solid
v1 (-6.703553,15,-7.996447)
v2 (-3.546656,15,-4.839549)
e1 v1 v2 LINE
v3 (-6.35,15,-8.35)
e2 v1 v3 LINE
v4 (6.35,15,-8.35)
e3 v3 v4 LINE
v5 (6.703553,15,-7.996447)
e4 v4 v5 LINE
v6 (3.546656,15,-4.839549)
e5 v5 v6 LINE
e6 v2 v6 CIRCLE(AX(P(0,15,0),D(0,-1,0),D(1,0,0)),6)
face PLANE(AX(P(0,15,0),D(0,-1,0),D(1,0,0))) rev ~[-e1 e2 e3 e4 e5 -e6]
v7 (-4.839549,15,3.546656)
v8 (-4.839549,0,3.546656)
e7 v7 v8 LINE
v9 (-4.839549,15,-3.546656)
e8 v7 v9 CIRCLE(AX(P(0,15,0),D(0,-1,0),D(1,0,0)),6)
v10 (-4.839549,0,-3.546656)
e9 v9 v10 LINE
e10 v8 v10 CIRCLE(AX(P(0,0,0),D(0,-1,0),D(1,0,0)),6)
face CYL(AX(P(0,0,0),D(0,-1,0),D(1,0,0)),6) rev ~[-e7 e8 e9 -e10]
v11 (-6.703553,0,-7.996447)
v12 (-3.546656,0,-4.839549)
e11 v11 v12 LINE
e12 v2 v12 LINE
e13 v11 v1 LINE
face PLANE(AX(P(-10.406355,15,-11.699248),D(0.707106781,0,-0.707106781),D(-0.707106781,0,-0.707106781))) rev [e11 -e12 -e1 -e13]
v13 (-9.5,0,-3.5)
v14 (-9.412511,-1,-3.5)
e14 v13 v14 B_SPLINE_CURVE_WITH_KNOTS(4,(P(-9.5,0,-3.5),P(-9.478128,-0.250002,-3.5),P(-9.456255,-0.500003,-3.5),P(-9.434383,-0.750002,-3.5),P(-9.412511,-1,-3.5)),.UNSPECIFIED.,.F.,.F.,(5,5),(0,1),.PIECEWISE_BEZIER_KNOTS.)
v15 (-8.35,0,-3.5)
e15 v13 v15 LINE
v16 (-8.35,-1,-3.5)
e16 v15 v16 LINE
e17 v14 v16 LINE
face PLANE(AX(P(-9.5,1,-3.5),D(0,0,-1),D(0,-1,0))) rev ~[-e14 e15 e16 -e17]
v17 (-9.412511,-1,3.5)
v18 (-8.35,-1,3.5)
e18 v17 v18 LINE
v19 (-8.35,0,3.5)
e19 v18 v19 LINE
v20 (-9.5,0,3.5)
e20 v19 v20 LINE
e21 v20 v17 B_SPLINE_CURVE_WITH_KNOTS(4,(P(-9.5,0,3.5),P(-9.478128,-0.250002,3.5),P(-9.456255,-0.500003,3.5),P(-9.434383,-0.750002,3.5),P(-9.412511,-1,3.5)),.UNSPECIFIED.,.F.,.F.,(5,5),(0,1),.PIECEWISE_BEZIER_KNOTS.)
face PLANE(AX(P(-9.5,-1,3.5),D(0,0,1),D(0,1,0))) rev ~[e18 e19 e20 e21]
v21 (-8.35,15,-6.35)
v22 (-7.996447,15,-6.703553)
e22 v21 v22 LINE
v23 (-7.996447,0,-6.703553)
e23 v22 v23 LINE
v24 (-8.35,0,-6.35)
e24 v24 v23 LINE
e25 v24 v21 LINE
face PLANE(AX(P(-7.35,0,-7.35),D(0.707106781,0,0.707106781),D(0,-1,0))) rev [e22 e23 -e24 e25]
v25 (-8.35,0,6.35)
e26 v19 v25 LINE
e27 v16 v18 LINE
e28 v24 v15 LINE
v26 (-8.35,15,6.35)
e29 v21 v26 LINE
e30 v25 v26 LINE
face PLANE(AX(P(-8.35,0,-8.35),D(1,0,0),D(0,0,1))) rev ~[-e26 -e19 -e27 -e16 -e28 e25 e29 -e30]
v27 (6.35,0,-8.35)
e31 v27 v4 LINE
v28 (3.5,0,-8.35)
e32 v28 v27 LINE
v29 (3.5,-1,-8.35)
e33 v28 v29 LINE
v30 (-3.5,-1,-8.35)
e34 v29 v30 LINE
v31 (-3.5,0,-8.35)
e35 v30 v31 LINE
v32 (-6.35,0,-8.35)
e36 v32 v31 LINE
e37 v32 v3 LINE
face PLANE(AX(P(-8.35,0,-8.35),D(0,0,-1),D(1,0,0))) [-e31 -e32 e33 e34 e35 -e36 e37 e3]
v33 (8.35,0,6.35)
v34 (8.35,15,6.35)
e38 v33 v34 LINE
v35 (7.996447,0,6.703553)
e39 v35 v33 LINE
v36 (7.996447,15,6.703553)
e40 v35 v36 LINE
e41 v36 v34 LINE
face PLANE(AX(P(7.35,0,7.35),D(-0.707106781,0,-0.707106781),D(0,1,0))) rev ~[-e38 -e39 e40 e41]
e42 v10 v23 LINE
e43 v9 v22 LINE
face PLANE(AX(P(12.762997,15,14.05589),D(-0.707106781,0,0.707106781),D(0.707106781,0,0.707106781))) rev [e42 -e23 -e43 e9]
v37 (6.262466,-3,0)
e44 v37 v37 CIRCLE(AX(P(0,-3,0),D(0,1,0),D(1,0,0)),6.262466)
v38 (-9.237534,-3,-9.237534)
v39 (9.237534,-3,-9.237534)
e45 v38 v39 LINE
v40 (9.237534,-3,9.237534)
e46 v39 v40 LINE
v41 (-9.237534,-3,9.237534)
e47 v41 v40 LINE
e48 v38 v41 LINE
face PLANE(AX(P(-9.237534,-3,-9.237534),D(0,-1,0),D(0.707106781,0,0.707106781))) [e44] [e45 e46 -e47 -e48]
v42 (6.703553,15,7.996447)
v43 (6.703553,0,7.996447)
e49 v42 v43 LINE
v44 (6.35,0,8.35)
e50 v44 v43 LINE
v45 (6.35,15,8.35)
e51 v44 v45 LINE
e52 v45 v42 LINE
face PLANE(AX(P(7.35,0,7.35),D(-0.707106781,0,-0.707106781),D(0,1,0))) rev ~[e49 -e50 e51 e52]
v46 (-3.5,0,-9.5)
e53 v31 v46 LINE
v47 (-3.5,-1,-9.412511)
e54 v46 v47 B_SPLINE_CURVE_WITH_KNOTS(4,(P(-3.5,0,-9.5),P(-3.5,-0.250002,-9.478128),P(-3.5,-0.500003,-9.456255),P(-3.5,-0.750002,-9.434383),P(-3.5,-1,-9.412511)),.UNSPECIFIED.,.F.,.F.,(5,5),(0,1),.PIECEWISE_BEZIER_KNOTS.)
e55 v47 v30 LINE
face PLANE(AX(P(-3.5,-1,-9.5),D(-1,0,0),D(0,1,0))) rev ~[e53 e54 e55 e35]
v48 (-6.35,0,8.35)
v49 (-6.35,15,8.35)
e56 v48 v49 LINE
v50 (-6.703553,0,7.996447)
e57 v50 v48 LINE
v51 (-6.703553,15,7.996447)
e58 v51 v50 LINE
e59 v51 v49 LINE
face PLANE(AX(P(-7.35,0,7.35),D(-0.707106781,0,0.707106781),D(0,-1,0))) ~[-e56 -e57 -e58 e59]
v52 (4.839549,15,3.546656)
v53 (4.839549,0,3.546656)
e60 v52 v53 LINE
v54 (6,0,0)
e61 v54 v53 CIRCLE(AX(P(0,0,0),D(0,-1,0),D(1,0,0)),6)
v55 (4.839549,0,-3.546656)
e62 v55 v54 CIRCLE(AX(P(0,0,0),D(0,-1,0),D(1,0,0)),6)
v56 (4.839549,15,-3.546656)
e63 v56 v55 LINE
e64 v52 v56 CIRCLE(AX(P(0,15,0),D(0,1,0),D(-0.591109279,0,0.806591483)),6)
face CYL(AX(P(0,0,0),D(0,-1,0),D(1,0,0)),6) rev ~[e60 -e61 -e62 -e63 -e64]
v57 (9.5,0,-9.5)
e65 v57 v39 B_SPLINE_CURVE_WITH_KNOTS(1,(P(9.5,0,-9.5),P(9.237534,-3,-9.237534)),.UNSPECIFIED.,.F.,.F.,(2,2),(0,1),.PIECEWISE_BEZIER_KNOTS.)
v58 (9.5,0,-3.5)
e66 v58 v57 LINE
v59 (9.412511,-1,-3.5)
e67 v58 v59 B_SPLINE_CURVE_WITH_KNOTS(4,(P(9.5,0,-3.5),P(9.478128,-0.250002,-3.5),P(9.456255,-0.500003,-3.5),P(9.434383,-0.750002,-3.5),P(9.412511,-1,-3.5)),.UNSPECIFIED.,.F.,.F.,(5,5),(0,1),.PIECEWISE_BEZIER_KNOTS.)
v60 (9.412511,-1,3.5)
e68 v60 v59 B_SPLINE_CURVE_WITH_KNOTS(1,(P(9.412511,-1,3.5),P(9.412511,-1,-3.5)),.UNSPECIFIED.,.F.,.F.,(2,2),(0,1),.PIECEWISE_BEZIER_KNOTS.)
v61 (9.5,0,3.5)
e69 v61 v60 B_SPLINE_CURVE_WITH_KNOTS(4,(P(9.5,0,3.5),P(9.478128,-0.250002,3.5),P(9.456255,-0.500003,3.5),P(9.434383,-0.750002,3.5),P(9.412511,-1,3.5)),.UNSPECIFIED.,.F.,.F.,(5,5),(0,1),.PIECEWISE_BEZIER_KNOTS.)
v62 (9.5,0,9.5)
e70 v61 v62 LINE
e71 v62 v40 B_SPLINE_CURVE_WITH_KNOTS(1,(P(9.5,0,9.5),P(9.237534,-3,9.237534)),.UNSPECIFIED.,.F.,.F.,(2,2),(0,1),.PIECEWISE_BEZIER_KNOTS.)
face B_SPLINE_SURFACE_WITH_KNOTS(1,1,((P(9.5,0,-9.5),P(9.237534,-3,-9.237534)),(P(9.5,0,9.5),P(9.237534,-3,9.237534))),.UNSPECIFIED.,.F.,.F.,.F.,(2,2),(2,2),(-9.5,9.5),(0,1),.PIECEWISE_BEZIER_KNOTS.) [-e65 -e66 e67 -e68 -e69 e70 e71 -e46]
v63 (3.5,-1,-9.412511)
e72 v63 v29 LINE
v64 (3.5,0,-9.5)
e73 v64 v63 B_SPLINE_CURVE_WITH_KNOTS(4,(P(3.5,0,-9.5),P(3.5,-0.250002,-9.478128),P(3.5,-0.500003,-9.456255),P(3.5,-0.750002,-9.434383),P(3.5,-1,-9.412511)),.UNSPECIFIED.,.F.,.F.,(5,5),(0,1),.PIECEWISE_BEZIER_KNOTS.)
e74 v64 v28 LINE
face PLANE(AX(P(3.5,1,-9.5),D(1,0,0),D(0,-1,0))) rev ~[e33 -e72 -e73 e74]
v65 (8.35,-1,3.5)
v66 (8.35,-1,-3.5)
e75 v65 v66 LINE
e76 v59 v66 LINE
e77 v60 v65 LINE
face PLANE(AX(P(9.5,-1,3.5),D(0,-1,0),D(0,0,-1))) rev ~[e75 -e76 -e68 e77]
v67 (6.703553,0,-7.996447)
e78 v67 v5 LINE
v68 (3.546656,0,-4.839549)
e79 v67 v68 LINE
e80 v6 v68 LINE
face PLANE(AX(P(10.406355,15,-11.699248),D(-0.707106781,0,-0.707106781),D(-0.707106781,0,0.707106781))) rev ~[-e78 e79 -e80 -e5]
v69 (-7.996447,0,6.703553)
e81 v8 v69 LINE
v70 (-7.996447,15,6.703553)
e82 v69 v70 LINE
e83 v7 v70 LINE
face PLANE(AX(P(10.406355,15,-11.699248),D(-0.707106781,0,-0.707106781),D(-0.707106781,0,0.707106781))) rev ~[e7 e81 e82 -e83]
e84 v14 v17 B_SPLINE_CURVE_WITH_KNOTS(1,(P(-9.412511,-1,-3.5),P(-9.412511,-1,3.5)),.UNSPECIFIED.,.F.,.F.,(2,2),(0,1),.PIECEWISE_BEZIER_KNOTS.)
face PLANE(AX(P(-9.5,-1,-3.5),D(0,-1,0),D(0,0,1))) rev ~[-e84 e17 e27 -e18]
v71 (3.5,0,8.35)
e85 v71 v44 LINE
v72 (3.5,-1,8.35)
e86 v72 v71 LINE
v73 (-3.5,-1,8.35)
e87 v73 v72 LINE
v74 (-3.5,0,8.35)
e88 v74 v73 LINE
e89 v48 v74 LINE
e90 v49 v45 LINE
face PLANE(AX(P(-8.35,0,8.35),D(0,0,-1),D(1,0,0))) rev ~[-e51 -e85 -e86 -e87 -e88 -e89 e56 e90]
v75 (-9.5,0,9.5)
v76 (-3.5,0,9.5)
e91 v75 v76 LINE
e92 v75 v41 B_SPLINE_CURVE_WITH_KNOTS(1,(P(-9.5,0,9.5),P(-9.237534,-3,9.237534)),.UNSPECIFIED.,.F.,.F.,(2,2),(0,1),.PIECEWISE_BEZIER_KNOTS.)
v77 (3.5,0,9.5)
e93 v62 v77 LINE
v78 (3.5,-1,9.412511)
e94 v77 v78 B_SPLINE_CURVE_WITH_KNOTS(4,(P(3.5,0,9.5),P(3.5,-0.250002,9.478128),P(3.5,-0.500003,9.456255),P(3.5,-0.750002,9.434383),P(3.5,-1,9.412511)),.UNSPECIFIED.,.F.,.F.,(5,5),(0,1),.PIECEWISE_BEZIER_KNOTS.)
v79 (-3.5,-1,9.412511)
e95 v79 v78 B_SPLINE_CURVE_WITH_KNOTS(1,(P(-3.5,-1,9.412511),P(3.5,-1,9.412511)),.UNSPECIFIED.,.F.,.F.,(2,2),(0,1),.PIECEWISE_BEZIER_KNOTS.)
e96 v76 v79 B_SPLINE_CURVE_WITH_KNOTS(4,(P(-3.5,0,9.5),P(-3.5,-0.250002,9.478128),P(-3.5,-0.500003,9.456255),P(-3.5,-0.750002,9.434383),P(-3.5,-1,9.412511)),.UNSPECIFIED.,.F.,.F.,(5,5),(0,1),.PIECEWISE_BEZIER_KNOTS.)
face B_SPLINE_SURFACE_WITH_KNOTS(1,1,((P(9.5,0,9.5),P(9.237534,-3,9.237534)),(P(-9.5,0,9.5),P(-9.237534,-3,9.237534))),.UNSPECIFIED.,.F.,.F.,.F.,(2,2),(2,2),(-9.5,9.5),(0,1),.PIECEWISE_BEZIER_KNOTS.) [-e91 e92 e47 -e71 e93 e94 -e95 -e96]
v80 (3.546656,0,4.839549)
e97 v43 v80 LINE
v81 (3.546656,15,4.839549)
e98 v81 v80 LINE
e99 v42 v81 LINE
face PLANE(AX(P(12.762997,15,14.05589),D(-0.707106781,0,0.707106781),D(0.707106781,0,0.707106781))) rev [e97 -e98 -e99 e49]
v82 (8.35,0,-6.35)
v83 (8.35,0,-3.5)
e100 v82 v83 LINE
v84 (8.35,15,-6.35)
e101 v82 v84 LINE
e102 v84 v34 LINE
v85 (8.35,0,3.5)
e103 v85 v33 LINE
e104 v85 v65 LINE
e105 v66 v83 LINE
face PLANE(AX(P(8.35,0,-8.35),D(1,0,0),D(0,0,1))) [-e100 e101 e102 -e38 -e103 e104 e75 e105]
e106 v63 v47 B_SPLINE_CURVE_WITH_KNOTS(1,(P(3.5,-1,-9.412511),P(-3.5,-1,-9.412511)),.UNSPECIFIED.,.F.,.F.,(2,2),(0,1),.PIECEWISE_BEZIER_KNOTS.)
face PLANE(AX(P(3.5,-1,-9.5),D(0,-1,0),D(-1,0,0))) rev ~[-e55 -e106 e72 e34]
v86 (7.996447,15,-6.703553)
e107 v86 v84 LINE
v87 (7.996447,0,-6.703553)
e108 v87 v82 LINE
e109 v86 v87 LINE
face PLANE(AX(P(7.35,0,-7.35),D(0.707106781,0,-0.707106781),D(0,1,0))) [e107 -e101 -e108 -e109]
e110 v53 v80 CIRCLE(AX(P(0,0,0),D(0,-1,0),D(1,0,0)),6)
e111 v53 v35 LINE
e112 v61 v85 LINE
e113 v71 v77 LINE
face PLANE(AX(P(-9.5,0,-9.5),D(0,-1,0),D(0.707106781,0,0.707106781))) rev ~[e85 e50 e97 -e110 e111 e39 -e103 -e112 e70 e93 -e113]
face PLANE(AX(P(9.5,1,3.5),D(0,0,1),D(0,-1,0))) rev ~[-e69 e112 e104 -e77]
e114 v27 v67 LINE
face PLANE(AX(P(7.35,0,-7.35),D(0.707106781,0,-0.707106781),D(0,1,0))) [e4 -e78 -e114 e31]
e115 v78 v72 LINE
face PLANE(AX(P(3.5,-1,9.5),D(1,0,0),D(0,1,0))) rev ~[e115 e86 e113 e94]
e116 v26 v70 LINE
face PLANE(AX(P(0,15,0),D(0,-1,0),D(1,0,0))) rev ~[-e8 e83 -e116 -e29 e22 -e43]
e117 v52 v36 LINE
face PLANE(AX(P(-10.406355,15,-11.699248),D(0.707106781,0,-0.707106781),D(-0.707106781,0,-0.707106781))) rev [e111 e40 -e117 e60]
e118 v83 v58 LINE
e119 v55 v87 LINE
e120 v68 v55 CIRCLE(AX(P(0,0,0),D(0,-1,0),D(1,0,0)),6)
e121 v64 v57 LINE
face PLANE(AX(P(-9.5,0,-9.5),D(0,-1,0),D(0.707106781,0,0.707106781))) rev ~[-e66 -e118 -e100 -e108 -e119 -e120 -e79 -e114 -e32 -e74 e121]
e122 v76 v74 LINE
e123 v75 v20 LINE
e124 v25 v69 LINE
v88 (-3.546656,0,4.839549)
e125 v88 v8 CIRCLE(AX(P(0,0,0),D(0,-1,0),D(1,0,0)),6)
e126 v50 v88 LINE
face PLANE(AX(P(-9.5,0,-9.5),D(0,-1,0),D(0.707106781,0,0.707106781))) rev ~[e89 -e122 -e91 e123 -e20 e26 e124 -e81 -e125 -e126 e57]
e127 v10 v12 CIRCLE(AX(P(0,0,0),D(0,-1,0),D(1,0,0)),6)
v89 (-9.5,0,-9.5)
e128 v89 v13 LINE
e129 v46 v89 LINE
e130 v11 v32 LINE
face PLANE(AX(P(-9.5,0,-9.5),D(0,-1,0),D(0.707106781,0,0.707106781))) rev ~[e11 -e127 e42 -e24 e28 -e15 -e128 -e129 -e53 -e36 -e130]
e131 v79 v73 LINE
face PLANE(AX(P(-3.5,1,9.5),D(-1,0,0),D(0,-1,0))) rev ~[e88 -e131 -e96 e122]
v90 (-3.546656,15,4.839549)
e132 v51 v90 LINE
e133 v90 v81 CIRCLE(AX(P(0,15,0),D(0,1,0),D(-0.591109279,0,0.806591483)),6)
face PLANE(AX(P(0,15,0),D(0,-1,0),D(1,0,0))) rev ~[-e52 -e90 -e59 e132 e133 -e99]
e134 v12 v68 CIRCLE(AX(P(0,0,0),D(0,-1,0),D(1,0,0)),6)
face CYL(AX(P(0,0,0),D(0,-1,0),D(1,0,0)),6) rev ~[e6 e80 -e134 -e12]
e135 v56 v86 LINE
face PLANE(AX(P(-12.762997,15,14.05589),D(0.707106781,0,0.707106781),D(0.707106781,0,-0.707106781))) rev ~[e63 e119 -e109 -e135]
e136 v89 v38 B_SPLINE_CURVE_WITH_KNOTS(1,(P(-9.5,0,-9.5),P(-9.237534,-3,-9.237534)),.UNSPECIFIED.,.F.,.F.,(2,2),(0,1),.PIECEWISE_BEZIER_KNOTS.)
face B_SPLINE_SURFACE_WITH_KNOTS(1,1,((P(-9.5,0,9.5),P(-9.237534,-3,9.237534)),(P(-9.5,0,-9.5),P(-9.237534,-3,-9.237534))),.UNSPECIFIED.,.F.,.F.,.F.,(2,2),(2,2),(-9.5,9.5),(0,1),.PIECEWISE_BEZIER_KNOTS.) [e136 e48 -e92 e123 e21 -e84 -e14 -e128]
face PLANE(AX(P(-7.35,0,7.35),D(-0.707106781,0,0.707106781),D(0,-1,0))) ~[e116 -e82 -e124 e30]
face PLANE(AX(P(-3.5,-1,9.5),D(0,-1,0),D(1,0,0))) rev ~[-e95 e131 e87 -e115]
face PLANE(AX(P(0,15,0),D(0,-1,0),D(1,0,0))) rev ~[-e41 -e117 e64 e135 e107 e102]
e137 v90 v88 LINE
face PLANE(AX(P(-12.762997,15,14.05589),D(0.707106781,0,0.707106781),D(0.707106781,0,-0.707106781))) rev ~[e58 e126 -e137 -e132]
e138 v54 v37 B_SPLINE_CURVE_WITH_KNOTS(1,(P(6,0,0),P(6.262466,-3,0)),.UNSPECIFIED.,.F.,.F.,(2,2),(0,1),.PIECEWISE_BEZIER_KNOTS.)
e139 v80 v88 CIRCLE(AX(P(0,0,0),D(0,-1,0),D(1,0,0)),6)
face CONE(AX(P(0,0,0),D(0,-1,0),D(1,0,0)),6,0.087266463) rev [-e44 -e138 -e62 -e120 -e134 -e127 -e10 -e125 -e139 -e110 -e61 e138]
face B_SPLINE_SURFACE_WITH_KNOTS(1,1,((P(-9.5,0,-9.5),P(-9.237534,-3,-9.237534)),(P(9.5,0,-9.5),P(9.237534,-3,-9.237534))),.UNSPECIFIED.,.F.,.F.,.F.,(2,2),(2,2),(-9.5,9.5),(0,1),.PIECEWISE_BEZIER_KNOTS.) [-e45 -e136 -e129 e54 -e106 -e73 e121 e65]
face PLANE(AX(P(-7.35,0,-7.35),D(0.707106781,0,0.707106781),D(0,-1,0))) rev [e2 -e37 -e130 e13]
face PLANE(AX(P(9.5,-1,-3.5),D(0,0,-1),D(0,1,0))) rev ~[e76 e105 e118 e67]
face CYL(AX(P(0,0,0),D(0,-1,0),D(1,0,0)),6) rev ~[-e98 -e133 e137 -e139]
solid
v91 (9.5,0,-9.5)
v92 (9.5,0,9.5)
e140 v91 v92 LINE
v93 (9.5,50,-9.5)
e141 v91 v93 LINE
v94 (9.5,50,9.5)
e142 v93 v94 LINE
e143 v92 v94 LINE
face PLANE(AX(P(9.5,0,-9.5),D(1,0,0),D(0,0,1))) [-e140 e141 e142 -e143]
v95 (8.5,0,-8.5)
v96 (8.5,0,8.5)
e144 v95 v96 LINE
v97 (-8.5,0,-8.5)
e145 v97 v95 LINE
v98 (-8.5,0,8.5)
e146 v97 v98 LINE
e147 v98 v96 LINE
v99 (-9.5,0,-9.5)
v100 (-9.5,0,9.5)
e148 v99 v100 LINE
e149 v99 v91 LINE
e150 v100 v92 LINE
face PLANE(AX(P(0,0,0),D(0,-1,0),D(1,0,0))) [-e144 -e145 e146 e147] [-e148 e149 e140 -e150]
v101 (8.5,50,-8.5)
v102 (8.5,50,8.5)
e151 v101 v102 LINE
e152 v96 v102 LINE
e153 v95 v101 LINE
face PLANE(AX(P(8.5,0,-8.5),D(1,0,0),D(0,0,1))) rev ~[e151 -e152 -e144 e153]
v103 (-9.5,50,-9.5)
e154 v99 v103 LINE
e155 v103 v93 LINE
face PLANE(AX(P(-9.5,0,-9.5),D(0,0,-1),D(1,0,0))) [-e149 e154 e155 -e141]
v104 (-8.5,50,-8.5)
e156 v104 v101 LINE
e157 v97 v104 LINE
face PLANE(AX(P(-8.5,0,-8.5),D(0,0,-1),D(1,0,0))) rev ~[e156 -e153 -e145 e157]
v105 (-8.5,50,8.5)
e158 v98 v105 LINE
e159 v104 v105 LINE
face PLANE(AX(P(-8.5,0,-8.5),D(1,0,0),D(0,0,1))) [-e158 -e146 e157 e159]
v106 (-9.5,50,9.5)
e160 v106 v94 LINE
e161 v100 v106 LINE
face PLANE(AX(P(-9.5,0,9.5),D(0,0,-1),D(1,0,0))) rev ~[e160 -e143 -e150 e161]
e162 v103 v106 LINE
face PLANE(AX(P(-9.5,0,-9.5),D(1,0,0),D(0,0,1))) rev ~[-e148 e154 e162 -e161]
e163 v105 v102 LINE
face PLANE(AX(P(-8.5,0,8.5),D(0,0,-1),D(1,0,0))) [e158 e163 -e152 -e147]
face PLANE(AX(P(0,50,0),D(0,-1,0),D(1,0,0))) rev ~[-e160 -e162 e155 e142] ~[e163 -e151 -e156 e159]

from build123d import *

# Parameters (mm, degrees)
F0_W            = 19
F0_H            = 19
F0_W_2          = 17
F0_H_2          = 17
F1_DEPTH        = 50
F2_W            = 16.7
F2_H            = 16.7
F2_R            = 6
F3_DEPTH        = 15
F4_W            = 19
F4_H            = 19
F4_R            = 6
F5_DEPTH        = 3
F5_TAPER        = 5
F6_W            = 7
F6_H            = 1
F7_DEPTH        = 1.15
F7_COPIES_COUNT = 4
F8_SIZE         = 2
F10_DEPTH       = 15


# Not quite as in the source:
# - a pattern or mirror of a feature is missing from the dataset's text; its kind, count and spacing are read off the source's solid


with BuildPart() as f1:
    # F0 (on Front) → F1 (new body)
    with BuildSketch(Plane.XZ):
        Rectangle(F0_W, F0_H)
        Rectangle(F0_W_2, F0_H_2, mode=Mode.SUBTRACT)
    extrude(amount=-F1_DEPTH)


with BuildPart() as f3:
    # F2 (on face) → F3 (new body)
    with BuildSketch(Plane.XZ):
        Rectangle(F2_W, F2_H)
        Circle(F2_R, mode=Mode.SUBTRACT)
    extrude(amount=-F3_DEPTH)

    # F4 (on face) → F5 (join)
    with BuildSketch(Plane.XZ):
        Rectangle(F4_W, F4_H)
        Circle(F4_R, mode=Mode.SUBTRACT)
    extrude(amount=F5_DEPTH, taper=F5_TAPER)

    # F6 (on face) → F7 (cut)
    with BuildSketch(Plane.XY.offset(9.5)):
        with Locations((0, -0.5)):
            Rectangle(F6_W, F6_H)
        with Locations((0, 0.5)):
            Rectangle(F6_W, F6_H)
    f7 = extrude(amount=-F7_DEPTH, mode=Mode.SUBTRACT)

    # F7_copies: F7 ×4 about axis
    f7_copies_axis = Axis((0, 0, 0), (0, 1, 0))
    for i in range(1, F7_COPIES_COUNT):
        add(f7.rotate(f7_copies_axis, i * 360 / F7_COPIES_COUNT), mode=Mode.SUBTRACT)

    # F8
    f8_edges = [f3.edges().sort_by_distance(p)[0] for p in [
        (8.35, 7.5, 8.35),
        (8.35, 7.5, -8.35),
        (-8.35, 7.5, -8.35),
        (-8.35, 7.5, 8.35),
    ]]
    chamfer(f8_edges, length=F8_SIZE)

    # F9 (on face) → F10 (cut, through all)
    with BuildSketch(Plane(origin=(0, 15, 0), x_dir=(-1, 0, 0), z_dir=(0, 1, 0))):
        with BuildLine():
            Line((7.9964466094, 6.7035533906), (6.7035533906, 7.9964466094))
            Line((6.7035533906, 7.9964466094), (3.5466556766, 4.8395488954))
            ThreePointArc((3.5466556766, 4.8395488954), (4.2426406871, 4.2426406871), (4.8395488954, 3.5466556766))
            Line((4.8395488954, 3.5466556766), (7.9964466094, 6.7035533906))
        make_face()
        Polygon((12.7629971477, 14.0558903665), (6.7035533906, 7.9964466094), (7.9964466094, 6.7035533906), (13.9659964202, 12.6731032014), align=None)
        with BuildLine():
            ThreePointArc((4.8395488954, 3.5466556766), (4.2426406871, 4.2426406871), (3.5466556766, 4.8395488954))
            Line((3.5466556766, 4.8395488954), (-4.8395488954, -3.5466556766))
            ThreePointArc((-4.8395488954, -3.5466556766), (-4.2426406871, -4.2426406871), (-3.5466556766, -4.8395488954))
            Line((-3.5466556766, -4.8395488954), (4.8395488954, 3.5466556766))
        make_face()
        with BuildLine():
            ThreePointArc((-3.5466556766, -4.8395488954), (-4.2426406871, -4.2426406871), (-4.8395488954, -3.5466556766))
            Line((-4.8395488954, -3.5466556766), (-7.9964466094, -6.7035533906))
            Line((-7.9964466094, -6.7035533906), (-6.7035533906, -7.9964466094))
            Line((-6.7035533906, -7.9964466094), (-3.5466556766, -4.8395488954))
        make_face()
        Polygon((-6.7035533906, -7.9964466094), (-7.9964466094, -6.7035533906), (-11.6992480187, -10.4063547999), (-10.4063547999, -11.6992480187), align=None)
    f10 = extrude(amount=-F10_DEPTH, mode=Mode.SUBTRACT)

    # F10_copies: F10 across plane
    add(f10.mirror(Plane(origin=(0, 0, 0), x_dir=(0, 0, 1), z_dir=(1, 0, 0))), mode=Mode.SUBTRACT)


solid = Compound([f1.part, f3.part])
